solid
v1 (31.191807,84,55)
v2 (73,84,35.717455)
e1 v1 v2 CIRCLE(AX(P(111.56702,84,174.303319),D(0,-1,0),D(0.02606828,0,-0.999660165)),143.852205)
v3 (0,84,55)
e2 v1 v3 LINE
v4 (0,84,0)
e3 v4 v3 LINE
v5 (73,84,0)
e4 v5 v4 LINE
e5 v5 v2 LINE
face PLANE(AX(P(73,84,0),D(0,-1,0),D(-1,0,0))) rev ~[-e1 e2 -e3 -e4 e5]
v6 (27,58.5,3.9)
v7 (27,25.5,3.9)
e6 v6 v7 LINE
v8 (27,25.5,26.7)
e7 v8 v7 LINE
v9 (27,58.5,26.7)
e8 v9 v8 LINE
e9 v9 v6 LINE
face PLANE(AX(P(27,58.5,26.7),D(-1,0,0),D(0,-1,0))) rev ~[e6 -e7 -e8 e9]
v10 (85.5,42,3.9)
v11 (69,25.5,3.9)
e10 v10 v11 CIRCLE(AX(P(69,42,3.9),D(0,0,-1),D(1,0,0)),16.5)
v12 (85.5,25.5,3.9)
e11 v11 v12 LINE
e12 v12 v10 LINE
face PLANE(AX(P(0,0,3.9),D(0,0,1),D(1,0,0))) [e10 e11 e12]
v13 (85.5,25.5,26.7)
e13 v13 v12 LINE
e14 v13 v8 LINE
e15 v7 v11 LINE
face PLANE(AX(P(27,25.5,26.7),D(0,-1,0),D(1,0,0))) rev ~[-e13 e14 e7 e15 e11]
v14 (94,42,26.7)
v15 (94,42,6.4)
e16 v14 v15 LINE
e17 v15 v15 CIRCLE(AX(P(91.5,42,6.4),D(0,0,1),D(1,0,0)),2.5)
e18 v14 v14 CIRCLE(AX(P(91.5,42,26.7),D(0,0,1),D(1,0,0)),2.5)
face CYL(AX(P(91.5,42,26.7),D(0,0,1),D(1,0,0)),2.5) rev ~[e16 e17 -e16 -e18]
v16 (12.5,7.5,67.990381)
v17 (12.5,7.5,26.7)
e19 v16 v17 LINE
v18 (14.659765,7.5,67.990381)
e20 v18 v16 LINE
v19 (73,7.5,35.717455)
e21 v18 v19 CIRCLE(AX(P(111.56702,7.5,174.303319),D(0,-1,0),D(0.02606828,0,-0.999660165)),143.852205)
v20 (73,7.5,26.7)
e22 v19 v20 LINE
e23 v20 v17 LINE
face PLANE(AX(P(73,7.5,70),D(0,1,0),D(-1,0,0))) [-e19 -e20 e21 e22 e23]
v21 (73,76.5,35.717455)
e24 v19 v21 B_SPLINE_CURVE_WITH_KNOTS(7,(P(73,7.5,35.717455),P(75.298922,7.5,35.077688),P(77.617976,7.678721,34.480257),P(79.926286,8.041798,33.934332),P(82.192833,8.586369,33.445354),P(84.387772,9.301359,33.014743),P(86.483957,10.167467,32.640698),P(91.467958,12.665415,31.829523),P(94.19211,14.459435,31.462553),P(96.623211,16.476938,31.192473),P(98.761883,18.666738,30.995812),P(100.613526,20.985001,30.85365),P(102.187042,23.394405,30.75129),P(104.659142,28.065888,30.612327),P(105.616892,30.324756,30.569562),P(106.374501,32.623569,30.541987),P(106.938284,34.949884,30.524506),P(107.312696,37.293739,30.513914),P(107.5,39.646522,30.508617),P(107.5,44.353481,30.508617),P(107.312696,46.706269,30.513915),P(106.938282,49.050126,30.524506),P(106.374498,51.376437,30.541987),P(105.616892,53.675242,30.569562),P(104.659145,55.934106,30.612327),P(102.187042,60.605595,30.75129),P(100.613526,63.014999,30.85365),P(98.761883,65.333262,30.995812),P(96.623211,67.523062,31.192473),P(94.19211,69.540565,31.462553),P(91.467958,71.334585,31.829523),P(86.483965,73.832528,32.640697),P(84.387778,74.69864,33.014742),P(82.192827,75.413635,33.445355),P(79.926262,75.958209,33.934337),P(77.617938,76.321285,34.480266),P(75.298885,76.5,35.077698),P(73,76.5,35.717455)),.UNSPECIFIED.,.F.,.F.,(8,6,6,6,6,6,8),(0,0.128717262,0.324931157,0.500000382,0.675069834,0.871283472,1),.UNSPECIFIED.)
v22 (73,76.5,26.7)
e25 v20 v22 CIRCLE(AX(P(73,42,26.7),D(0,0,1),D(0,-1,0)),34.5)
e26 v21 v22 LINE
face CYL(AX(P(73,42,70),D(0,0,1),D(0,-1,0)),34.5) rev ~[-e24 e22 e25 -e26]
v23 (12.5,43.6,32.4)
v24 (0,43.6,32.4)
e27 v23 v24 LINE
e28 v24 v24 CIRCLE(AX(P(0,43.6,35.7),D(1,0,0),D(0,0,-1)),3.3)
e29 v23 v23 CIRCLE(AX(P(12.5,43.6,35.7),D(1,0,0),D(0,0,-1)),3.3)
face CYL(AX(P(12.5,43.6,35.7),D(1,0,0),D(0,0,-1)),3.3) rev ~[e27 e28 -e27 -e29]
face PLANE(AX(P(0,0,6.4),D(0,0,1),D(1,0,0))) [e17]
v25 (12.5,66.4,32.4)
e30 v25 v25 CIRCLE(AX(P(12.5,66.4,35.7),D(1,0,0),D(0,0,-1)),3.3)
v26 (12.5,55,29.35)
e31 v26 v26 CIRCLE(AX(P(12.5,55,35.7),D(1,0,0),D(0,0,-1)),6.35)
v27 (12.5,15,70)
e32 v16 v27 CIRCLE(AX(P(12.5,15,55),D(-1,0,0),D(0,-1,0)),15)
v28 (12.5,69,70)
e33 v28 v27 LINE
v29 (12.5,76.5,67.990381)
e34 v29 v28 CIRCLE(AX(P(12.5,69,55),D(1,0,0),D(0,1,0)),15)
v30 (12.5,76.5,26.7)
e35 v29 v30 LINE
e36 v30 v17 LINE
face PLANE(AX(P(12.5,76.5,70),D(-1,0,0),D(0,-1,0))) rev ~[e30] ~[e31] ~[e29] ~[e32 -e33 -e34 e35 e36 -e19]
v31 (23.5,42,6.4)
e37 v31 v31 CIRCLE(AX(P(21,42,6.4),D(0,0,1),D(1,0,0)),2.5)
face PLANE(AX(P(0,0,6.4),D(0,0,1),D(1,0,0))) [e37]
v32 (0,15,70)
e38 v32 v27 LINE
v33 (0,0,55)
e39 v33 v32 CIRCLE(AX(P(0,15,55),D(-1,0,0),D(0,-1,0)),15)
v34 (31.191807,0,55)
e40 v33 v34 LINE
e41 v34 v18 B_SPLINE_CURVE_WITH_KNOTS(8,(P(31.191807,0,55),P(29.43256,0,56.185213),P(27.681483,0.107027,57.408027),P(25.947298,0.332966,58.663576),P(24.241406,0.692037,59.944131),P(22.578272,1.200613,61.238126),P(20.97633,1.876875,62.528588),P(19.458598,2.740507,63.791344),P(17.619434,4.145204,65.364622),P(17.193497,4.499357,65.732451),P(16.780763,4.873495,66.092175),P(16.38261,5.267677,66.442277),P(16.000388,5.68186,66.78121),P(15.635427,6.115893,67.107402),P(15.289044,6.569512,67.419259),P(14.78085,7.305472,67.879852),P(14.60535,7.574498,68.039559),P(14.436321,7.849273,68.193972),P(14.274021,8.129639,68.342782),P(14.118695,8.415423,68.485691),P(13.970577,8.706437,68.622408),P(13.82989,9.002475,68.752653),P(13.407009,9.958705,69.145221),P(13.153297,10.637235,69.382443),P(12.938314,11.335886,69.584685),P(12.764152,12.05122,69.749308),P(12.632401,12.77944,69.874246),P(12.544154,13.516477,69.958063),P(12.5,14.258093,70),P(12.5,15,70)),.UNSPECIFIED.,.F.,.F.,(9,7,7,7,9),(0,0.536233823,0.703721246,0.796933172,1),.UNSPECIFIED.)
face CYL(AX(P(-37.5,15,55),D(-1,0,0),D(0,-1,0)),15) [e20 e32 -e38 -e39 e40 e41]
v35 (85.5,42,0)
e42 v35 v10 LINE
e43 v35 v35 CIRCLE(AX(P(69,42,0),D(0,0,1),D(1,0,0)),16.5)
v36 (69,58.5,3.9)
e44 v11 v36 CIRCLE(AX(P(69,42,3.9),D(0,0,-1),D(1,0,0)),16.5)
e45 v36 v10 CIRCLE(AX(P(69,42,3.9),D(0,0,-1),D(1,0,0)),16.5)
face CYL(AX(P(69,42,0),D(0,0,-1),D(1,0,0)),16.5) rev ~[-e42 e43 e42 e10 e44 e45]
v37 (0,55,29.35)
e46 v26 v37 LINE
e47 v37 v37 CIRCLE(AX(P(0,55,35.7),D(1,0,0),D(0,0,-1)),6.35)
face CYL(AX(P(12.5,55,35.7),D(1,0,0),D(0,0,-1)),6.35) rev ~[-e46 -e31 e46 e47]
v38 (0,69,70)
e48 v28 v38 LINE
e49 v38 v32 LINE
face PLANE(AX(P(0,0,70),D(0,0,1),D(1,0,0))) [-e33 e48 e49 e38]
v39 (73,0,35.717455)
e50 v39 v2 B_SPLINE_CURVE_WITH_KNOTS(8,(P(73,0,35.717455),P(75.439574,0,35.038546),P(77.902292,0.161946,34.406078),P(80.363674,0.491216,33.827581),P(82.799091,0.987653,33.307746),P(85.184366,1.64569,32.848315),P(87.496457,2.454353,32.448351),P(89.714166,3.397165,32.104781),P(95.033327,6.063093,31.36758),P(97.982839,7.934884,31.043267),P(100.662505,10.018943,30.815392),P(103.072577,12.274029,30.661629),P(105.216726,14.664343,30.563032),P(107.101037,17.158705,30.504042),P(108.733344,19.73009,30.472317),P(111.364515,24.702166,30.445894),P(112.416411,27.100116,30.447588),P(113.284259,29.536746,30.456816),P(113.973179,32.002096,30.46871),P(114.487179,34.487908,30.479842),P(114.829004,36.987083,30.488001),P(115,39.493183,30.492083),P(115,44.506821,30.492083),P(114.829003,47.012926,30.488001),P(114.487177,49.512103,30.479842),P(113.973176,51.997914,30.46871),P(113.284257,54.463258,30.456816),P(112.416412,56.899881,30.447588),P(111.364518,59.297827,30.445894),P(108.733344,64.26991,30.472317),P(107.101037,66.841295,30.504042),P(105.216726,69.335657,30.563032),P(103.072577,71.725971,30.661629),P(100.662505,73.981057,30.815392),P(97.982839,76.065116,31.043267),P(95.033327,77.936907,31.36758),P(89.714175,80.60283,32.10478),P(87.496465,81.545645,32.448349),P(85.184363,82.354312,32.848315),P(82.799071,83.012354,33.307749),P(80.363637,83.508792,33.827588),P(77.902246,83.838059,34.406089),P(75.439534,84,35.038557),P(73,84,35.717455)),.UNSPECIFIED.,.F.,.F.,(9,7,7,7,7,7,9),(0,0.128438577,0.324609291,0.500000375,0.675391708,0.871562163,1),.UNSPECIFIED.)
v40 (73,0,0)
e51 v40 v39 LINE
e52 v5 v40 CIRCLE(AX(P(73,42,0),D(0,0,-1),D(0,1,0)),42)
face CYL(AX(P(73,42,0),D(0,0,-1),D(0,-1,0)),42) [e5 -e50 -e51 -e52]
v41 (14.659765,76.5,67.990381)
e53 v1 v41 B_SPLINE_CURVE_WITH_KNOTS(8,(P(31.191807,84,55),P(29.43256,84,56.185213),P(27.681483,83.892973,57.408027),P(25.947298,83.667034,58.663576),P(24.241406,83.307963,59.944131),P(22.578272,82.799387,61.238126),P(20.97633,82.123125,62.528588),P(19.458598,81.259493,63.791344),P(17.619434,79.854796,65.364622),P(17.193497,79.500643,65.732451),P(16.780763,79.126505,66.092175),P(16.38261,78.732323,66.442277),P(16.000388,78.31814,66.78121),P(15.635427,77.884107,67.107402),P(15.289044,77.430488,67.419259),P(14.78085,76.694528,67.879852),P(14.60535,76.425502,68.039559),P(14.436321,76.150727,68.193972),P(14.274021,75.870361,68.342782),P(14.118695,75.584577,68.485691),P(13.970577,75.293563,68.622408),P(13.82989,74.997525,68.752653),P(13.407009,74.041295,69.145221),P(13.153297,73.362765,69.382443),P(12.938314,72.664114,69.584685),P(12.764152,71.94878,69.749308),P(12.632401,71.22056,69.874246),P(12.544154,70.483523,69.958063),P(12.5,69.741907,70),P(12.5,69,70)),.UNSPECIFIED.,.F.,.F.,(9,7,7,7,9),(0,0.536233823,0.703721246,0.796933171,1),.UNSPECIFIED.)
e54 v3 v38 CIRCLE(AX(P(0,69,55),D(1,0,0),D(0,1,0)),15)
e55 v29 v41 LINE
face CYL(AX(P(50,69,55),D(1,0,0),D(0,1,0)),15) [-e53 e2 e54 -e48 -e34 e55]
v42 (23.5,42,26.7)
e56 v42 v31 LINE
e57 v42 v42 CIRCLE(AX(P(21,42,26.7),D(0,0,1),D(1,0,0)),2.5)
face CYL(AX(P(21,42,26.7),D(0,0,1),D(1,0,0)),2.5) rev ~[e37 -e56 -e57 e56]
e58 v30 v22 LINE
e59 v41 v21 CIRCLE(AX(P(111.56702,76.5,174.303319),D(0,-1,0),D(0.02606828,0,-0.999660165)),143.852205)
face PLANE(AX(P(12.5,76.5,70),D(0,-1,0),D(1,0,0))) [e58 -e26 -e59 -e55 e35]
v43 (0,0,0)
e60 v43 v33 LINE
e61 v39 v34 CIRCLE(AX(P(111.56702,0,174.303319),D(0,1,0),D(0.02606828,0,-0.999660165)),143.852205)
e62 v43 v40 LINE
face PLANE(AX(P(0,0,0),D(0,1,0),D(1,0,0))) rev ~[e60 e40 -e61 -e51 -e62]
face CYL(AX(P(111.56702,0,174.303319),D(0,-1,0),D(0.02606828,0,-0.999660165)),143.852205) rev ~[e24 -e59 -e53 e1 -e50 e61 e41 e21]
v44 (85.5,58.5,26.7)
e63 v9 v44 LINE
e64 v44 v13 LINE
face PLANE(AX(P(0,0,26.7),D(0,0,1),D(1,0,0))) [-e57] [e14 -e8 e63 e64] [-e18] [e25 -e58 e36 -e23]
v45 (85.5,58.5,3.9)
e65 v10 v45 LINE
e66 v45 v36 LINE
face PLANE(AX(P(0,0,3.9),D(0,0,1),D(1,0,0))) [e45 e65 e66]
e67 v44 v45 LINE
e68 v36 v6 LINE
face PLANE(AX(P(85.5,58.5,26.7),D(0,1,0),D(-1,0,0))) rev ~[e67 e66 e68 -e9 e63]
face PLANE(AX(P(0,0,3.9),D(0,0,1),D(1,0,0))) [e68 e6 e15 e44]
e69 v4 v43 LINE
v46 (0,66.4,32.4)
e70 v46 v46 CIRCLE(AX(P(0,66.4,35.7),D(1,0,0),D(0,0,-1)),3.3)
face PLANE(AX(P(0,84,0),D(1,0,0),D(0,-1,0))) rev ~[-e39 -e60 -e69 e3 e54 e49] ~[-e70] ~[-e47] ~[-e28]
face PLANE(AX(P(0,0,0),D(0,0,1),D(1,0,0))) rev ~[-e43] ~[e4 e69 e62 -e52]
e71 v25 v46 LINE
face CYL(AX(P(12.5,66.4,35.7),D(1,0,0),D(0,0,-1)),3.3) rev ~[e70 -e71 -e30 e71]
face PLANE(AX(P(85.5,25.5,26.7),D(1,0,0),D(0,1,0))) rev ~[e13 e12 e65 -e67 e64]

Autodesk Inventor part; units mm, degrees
ref_plane "YZ Plane" through (0, 0, 0) normal (1, 0, 0) x (0, 1, 0)
ref_plane "XZ Plane" through (0, 0, 0) normal (0, 1, 0) x (-1, 0, 0)
ref_plane "XY Plane" through (0, 0, 0) normal (0, 0, 1) x (1, 0, 0)
sketch "Sketch1" plane through (0, 0, 0) normal (0, 0, 1) x (1, 0, 0)
  line L0 (0, 0) -> (115, 0)
  line L1 (115, 0) -> (115, 84)
  line L2 (115, 84) -> (0, 84)
  line L3 (0, 84) -> (0, 0)
  line L4 (115, 42) -> (0, 42) construction
  circle A0 centre (69, 42) radius 16.5
  arc A1 (73, 0) -> (73, 84) centre (73, 42) ccw
  dimension "d0" = 115
  dimension "d1" = 84
  dimension "d2" = 33
  dimension "d3" = 46
extrude "Extrusion1" add sketch "Sketch1" along normal blind 70 contours L3 L2 A1 L0
sketch "Sketch2" plane through (0, 0, 70) normal (0, 0, 1) x (1, 0, 0)
  arc A0 (73, 0) -> (73, 84) centre (73, 42) ccw projected
  line L0 (73, 84) -> (0, 84)
  line L1 (0, 84) -> (0, 0)
  line L2 (0, 0) -> (73, 0)
  arc A1 (73, 0) -> (73, 84) centre (73, 42) ccw
  line L3 (12.5, 76.5) -> (73, 76.5)
  arc A2 (73, 7.5) -> (73, 76.5) centre (73, 42) ccw
  line L4 (73, 7.5) -> (12.5, 7.5)
  line L5 (12.5, 76.5) -> (12.5, 7.5)
  dimension "d6" = 7.5
  dimension "d7" = 12.5
extrude "Extrusion2" cut sketch "Sketch2" against normal blind 43.3 contours L3 A2 L4 L5
sketch "Sketch3" plane through (0, 0, 0) normal (0, 1, 0) x (-1, 0, 0)
  line L0 (0, 0) -> (0, 70) construction
  line L1 (0, 30.5) -> (-115.317, 30.5) construction
  line L2 (-73, 0) -> (-115, 0) construction
  line L3 (-73, 0) -> (0, 0) construction
  line L4 (-12.5, 0) -> (-12.5, 70) construction
  line L5 (-107.817, 30.5) -> (-107.817, 0) construction
  arc A0 (-115.317, 30.5) -> (-12.5, 70) centre (-111.567, 174.3032) ccw
  line L6 (-12.5, 70) -> (-115.317, 70)
  line L7 (-115.317, 30.5) -> (-115.317, 70)
  dimension "d10" = 30.5
  dimension "d11" = 12.5
  dimension "d12" = 7.5
extrude "Extrusion3" cut sketch "Sketch3" along normal through all
fillet "Fillet1" radius 15 2 edges at (6.25, 0, 70) (6.25, 84, 70)
sketch "Sketch4" plane through (12.5, 7.5, 26.7) normal (1, 0, 0) x (0, 0, -1)
  line L0 (-9.0174, -7.5) -> (-28.3, -7.5) construction
  line L1 (-9, -7.5) -> (-9, 76.5) construction
  line L2 (26.7, 76.5) -> (-28.3, 76.5) construction
  line L3 (0, 0) -> (0, 69) construction
  circle A0 centre (-9, 47.5) radius 6.35
  circle A1 centre (-9, 58.9) radius 3.3
  circle A2 centre (-9, 36.1) radius 3.3
  point P0 (26.7, -7.5)
  dimension "d16" = 9
  dimension "d17" = 12.7
  dimension "d18" = 29
  dimension "d19" = 6.6
  dimension "d20" = 11.4
  dimension "d21" = 6.6
  dimension "d22" = 11.4
extrude "Extrusion4" cut sketch "Sketch4" against normal through all
sketch "Sketch5" plane through (0, 0, 26.7) normal (0, 0, 1) x (1, 0, 0)
  circle A0 centre (69, 42) radius 16.5 construction
  line L0 (85.5, 42) -> (85.5, 58.5) construction
  line L1 (69, 58.5) -> (85.5, 58.5) construction
  line L2 (85.5, 58.5) -> (27, 58.5)
  line L3 (27, 58.5) -> (27, 25.5)
  line L4 (27, 25.5) -> (85.5, 25.5)
  line L5 (85.5, 25.5) -> (85.5, 58.5)
  point P0 (0, 0)
  dimension "d25" = 58.5
extrude "Extrusion5" cut sketch "Sketch5" against normal blind 22.8
sketch "Sketch6" plane through (0, 0, 26.7) normal (0, 0, 1) x (1, 0, 0)
  line L0 (27, 25.5) -> (27, 58.5) construction
  line L1 (27, 42) -> (12.5, 42) construction
  line L2 (12.5, 46.9) -> (12.5, 40.3) construction
  circle A0 centre (21, 42) radius 2.5
  line L3 (85.5, 25.5) -> (27, 25.5) construction
  line L4 (56.25, 25.5) -> (56.25, 58.5) construction
  circle A1 centre (91.5, 42) radius 2.5
  point P0 (0, 0)
  dimension "d28" = 5
  dimension "d29" = 6
extrude "Extrusion6" cut sketch "Sketch6" against normal blind 20.3
properties part number "Final Arm 03"
